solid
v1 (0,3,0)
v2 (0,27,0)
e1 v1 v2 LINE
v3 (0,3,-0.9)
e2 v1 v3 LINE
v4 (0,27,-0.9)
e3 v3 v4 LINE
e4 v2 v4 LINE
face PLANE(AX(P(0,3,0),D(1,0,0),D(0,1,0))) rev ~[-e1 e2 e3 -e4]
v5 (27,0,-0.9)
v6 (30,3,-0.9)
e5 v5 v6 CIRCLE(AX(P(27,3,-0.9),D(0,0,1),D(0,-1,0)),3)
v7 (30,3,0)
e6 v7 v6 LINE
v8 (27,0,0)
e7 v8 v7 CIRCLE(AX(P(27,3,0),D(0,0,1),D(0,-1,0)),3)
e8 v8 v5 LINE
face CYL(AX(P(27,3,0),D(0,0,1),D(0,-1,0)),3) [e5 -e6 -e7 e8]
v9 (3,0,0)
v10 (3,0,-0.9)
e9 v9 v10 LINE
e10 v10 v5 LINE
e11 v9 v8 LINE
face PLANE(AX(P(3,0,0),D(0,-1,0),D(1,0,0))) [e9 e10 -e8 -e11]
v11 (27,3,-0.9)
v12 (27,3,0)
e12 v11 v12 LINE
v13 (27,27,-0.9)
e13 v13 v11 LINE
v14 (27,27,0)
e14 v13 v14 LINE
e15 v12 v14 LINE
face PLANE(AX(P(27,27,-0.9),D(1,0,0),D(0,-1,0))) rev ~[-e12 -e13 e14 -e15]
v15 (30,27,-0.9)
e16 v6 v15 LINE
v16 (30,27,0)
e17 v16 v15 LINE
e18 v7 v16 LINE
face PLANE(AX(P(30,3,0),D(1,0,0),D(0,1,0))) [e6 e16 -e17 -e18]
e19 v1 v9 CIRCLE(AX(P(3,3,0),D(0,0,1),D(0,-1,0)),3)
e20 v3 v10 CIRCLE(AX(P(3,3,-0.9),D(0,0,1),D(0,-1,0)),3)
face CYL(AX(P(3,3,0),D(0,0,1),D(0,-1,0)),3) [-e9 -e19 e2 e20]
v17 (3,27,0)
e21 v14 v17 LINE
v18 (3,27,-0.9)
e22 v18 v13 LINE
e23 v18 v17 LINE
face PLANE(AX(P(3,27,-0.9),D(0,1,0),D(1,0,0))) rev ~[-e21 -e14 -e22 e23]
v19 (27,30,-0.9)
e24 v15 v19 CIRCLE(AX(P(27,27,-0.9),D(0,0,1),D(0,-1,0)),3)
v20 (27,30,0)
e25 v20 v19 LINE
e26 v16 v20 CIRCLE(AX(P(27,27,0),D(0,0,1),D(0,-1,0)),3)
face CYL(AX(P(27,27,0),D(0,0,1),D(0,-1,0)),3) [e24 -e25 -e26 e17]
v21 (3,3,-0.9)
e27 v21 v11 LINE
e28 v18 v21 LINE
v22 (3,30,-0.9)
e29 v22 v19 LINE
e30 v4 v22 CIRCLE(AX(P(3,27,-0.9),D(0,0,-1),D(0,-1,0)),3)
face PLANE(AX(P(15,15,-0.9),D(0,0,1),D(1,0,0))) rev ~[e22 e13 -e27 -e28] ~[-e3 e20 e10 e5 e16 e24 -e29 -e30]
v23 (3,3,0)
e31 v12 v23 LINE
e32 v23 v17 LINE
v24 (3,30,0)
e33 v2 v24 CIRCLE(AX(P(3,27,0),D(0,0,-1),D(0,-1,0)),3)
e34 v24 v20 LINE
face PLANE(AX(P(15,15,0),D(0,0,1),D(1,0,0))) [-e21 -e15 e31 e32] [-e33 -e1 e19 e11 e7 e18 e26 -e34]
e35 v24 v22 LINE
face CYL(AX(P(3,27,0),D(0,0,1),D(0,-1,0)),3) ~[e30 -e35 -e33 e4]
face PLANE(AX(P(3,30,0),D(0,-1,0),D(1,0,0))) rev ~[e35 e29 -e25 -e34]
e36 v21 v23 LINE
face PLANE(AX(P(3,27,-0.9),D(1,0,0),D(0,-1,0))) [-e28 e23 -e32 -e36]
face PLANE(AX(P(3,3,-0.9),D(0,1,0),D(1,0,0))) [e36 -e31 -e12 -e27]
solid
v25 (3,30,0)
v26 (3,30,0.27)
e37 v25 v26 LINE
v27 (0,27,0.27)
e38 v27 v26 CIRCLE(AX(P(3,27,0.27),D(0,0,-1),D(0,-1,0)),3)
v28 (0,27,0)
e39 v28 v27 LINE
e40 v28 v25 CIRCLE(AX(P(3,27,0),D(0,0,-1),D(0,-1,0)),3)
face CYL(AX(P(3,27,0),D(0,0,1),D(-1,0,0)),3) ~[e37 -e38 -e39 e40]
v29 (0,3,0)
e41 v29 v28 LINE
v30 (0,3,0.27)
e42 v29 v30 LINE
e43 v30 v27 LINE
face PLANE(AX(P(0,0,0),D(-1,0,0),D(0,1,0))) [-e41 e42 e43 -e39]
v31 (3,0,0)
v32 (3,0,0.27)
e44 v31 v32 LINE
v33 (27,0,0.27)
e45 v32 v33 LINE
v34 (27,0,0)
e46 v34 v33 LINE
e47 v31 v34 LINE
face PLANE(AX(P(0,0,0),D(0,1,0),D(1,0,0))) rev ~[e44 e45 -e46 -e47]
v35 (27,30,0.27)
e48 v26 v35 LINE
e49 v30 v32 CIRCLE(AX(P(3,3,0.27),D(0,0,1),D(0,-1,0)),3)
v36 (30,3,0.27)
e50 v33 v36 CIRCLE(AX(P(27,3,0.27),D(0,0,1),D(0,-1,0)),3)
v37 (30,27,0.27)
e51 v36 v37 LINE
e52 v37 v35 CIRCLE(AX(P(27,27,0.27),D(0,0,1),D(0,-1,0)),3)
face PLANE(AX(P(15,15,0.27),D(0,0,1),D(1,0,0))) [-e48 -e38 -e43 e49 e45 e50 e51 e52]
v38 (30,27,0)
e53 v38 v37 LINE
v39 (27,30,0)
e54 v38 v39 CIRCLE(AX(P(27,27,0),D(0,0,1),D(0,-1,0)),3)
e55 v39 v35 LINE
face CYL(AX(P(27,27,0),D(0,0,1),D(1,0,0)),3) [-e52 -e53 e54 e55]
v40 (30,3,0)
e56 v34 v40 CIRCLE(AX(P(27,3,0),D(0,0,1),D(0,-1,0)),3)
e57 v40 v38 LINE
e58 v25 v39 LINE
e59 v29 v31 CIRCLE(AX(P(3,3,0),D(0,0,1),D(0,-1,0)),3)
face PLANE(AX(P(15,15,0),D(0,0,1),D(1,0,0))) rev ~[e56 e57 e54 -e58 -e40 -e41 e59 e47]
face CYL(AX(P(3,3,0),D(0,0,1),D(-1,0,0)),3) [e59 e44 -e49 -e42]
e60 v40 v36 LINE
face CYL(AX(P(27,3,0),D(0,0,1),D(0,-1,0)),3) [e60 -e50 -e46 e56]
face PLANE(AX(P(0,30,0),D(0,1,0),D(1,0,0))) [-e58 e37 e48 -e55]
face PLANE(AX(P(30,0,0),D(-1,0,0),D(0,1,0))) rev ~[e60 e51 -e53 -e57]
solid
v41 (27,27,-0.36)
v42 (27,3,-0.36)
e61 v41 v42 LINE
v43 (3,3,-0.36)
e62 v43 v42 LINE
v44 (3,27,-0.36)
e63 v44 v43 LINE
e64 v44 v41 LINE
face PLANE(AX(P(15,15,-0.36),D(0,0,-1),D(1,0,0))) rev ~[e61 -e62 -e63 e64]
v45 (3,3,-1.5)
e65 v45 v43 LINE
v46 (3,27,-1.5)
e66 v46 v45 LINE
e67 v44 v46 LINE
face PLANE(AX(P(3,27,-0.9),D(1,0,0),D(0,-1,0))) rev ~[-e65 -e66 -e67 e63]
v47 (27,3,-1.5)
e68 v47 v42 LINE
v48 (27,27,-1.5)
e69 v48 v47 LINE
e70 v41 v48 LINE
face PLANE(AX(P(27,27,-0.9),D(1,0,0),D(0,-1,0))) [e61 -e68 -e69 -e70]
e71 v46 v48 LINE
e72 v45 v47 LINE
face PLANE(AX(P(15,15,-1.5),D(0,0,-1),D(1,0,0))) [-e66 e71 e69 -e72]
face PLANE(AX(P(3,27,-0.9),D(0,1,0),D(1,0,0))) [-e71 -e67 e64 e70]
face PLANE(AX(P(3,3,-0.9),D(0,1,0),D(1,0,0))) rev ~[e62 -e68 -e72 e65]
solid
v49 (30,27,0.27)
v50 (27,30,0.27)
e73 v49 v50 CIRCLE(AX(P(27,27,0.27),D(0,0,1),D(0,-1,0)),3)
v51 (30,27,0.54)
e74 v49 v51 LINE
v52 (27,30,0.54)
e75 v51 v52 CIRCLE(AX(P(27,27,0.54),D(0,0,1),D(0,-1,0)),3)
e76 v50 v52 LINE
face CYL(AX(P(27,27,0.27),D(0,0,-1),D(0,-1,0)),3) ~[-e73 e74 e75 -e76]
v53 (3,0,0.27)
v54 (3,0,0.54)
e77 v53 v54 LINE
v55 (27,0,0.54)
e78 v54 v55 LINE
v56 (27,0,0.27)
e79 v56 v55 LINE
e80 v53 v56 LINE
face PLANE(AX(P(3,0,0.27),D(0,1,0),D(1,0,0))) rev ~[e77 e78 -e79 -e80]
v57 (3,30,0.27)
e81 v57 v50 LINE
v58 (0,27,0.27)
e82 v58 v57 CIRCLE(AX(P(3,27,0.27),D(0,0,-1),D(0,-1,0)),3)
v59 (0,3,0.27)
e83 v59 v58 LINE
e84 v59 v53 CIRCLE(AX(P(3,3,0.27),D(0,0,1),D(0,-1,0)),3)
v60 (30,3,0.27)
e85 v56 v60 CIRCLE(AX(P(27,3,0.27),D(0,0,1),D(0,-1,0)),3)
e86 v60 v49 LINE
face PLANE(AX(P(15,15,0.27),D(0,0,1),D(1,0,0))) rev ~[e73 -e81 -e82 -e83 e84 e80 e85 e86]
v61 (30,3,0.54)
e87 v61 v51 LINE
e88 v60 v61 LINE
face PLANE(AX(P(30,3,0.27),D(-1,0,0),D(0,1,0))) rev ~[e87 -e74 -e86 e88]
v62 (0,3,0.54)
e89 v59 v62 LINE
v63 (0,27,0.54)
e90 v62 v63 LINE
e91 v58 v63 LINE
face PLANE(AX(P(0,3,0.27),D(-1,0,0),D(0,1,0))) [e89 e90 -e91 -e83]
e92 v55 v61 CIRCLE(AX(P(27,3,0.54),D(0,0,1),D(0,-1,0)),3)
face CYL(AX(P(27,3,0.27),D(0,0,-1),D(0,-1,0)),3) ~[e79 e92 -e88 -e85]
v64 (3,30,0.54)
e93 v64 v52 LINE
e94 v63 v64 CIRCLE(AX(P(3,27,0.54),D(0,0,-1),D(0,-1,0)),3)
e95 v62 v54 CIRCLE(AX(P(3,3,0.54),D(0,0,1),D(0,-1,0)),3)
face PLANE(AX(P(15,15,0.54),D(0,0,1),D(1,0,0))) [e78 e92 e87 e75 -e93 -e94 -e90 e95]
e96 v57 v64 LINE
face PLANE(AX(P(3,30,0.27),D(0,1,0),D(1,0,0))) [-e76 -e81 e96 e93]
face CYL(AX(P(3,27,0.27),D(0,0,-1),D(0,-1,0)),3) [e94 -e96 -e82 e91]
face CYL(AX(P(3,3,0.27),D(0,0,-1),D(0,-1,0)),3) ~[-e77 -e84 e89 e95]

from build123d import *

# Parameters (mm, degrees)
F0_W     = 30
F0_H     = 30
F1_DEPTH = 0.27
F2_R     = 3
F3_DEPTH = 0.27
F4_DEPTH = 0.9
F5_W     = 24
F5_H     = 24
F6_DEPTH = 25
F7_DEPTH = 0.6
F8_DEPTH = 0.54


with BuildPart() as f1:
    # F0 (on Top) → F1 (new body)
    with BuildSketch(Plane.XY):
        with Locations((15, 15)):
            Rectangle(F0_W, F0_H)
    extrude(amount=F1_DEPTH)

    # F2
    f2_edges = [f1.edges().sort_by_distance(p)[0] for p in [
        (30, 0, 0.135),
        (30, 30, 0.135),
        (0, 30, 0.135),
        (0, 0, 0.135),
    ]]
    fillet(f2_edges, radius=F2_R)


with BuildPart() as f3:
    # F3 (new): a face of the model
    f3_faces = [f1.part.faces().sort_by_distance(p)[0] for p in [
        (15, 15, 0.27),
    ]]
    extrude(f3_faces, amount=F3_DEPTH)


with BuildPart() as f4:
    # F4 (new): a face of the model
    f4_faces = [f1.part.faces().sort_by_distance(p)[0] for p in [
        (15, 15, 0),
    ]]
    extrude(f4_faces, amount=F4_DEPTH)

    # F5 (on face) → F6 (cut)
    with BuildSketch(Plane(origin=(0, 0, -0.9), x_dir=(1, 0, 0), z_dir=(0, 0, -1))):
        with Locations((15, -15)):
            Rectangle(F5_W, F5_H)
    extrude(amount=-F6_DEPTH, mode=Mode.SUBTRACT)


with BuildPart() as f7:
    # F5 (on face) → F7 (new body)
    with BuildSketch(Plane(origin=(0, 0, -0.9), x_dir=(1, 0, 0), z_dir=(0, 0, -1))):
        with Locations((15, -15)):
            Rectangle(F5_W, F5_H)
    extrude(amount=F7_DEPTH)

    # F5 (on face) → F8 (join)
    with BuildSketch(Plane(origin=(0, 0, -0.9), x_dir=(1, 0, 0), z_dir=(0, 0, -1))):
        with Locations((15, -15)):
            Rectangle(F5_W, F5_H)
    extrude(amount=-F8_DEPTH)


solid = Compound([f1.part, f3.part, f4.part, f7.part])
